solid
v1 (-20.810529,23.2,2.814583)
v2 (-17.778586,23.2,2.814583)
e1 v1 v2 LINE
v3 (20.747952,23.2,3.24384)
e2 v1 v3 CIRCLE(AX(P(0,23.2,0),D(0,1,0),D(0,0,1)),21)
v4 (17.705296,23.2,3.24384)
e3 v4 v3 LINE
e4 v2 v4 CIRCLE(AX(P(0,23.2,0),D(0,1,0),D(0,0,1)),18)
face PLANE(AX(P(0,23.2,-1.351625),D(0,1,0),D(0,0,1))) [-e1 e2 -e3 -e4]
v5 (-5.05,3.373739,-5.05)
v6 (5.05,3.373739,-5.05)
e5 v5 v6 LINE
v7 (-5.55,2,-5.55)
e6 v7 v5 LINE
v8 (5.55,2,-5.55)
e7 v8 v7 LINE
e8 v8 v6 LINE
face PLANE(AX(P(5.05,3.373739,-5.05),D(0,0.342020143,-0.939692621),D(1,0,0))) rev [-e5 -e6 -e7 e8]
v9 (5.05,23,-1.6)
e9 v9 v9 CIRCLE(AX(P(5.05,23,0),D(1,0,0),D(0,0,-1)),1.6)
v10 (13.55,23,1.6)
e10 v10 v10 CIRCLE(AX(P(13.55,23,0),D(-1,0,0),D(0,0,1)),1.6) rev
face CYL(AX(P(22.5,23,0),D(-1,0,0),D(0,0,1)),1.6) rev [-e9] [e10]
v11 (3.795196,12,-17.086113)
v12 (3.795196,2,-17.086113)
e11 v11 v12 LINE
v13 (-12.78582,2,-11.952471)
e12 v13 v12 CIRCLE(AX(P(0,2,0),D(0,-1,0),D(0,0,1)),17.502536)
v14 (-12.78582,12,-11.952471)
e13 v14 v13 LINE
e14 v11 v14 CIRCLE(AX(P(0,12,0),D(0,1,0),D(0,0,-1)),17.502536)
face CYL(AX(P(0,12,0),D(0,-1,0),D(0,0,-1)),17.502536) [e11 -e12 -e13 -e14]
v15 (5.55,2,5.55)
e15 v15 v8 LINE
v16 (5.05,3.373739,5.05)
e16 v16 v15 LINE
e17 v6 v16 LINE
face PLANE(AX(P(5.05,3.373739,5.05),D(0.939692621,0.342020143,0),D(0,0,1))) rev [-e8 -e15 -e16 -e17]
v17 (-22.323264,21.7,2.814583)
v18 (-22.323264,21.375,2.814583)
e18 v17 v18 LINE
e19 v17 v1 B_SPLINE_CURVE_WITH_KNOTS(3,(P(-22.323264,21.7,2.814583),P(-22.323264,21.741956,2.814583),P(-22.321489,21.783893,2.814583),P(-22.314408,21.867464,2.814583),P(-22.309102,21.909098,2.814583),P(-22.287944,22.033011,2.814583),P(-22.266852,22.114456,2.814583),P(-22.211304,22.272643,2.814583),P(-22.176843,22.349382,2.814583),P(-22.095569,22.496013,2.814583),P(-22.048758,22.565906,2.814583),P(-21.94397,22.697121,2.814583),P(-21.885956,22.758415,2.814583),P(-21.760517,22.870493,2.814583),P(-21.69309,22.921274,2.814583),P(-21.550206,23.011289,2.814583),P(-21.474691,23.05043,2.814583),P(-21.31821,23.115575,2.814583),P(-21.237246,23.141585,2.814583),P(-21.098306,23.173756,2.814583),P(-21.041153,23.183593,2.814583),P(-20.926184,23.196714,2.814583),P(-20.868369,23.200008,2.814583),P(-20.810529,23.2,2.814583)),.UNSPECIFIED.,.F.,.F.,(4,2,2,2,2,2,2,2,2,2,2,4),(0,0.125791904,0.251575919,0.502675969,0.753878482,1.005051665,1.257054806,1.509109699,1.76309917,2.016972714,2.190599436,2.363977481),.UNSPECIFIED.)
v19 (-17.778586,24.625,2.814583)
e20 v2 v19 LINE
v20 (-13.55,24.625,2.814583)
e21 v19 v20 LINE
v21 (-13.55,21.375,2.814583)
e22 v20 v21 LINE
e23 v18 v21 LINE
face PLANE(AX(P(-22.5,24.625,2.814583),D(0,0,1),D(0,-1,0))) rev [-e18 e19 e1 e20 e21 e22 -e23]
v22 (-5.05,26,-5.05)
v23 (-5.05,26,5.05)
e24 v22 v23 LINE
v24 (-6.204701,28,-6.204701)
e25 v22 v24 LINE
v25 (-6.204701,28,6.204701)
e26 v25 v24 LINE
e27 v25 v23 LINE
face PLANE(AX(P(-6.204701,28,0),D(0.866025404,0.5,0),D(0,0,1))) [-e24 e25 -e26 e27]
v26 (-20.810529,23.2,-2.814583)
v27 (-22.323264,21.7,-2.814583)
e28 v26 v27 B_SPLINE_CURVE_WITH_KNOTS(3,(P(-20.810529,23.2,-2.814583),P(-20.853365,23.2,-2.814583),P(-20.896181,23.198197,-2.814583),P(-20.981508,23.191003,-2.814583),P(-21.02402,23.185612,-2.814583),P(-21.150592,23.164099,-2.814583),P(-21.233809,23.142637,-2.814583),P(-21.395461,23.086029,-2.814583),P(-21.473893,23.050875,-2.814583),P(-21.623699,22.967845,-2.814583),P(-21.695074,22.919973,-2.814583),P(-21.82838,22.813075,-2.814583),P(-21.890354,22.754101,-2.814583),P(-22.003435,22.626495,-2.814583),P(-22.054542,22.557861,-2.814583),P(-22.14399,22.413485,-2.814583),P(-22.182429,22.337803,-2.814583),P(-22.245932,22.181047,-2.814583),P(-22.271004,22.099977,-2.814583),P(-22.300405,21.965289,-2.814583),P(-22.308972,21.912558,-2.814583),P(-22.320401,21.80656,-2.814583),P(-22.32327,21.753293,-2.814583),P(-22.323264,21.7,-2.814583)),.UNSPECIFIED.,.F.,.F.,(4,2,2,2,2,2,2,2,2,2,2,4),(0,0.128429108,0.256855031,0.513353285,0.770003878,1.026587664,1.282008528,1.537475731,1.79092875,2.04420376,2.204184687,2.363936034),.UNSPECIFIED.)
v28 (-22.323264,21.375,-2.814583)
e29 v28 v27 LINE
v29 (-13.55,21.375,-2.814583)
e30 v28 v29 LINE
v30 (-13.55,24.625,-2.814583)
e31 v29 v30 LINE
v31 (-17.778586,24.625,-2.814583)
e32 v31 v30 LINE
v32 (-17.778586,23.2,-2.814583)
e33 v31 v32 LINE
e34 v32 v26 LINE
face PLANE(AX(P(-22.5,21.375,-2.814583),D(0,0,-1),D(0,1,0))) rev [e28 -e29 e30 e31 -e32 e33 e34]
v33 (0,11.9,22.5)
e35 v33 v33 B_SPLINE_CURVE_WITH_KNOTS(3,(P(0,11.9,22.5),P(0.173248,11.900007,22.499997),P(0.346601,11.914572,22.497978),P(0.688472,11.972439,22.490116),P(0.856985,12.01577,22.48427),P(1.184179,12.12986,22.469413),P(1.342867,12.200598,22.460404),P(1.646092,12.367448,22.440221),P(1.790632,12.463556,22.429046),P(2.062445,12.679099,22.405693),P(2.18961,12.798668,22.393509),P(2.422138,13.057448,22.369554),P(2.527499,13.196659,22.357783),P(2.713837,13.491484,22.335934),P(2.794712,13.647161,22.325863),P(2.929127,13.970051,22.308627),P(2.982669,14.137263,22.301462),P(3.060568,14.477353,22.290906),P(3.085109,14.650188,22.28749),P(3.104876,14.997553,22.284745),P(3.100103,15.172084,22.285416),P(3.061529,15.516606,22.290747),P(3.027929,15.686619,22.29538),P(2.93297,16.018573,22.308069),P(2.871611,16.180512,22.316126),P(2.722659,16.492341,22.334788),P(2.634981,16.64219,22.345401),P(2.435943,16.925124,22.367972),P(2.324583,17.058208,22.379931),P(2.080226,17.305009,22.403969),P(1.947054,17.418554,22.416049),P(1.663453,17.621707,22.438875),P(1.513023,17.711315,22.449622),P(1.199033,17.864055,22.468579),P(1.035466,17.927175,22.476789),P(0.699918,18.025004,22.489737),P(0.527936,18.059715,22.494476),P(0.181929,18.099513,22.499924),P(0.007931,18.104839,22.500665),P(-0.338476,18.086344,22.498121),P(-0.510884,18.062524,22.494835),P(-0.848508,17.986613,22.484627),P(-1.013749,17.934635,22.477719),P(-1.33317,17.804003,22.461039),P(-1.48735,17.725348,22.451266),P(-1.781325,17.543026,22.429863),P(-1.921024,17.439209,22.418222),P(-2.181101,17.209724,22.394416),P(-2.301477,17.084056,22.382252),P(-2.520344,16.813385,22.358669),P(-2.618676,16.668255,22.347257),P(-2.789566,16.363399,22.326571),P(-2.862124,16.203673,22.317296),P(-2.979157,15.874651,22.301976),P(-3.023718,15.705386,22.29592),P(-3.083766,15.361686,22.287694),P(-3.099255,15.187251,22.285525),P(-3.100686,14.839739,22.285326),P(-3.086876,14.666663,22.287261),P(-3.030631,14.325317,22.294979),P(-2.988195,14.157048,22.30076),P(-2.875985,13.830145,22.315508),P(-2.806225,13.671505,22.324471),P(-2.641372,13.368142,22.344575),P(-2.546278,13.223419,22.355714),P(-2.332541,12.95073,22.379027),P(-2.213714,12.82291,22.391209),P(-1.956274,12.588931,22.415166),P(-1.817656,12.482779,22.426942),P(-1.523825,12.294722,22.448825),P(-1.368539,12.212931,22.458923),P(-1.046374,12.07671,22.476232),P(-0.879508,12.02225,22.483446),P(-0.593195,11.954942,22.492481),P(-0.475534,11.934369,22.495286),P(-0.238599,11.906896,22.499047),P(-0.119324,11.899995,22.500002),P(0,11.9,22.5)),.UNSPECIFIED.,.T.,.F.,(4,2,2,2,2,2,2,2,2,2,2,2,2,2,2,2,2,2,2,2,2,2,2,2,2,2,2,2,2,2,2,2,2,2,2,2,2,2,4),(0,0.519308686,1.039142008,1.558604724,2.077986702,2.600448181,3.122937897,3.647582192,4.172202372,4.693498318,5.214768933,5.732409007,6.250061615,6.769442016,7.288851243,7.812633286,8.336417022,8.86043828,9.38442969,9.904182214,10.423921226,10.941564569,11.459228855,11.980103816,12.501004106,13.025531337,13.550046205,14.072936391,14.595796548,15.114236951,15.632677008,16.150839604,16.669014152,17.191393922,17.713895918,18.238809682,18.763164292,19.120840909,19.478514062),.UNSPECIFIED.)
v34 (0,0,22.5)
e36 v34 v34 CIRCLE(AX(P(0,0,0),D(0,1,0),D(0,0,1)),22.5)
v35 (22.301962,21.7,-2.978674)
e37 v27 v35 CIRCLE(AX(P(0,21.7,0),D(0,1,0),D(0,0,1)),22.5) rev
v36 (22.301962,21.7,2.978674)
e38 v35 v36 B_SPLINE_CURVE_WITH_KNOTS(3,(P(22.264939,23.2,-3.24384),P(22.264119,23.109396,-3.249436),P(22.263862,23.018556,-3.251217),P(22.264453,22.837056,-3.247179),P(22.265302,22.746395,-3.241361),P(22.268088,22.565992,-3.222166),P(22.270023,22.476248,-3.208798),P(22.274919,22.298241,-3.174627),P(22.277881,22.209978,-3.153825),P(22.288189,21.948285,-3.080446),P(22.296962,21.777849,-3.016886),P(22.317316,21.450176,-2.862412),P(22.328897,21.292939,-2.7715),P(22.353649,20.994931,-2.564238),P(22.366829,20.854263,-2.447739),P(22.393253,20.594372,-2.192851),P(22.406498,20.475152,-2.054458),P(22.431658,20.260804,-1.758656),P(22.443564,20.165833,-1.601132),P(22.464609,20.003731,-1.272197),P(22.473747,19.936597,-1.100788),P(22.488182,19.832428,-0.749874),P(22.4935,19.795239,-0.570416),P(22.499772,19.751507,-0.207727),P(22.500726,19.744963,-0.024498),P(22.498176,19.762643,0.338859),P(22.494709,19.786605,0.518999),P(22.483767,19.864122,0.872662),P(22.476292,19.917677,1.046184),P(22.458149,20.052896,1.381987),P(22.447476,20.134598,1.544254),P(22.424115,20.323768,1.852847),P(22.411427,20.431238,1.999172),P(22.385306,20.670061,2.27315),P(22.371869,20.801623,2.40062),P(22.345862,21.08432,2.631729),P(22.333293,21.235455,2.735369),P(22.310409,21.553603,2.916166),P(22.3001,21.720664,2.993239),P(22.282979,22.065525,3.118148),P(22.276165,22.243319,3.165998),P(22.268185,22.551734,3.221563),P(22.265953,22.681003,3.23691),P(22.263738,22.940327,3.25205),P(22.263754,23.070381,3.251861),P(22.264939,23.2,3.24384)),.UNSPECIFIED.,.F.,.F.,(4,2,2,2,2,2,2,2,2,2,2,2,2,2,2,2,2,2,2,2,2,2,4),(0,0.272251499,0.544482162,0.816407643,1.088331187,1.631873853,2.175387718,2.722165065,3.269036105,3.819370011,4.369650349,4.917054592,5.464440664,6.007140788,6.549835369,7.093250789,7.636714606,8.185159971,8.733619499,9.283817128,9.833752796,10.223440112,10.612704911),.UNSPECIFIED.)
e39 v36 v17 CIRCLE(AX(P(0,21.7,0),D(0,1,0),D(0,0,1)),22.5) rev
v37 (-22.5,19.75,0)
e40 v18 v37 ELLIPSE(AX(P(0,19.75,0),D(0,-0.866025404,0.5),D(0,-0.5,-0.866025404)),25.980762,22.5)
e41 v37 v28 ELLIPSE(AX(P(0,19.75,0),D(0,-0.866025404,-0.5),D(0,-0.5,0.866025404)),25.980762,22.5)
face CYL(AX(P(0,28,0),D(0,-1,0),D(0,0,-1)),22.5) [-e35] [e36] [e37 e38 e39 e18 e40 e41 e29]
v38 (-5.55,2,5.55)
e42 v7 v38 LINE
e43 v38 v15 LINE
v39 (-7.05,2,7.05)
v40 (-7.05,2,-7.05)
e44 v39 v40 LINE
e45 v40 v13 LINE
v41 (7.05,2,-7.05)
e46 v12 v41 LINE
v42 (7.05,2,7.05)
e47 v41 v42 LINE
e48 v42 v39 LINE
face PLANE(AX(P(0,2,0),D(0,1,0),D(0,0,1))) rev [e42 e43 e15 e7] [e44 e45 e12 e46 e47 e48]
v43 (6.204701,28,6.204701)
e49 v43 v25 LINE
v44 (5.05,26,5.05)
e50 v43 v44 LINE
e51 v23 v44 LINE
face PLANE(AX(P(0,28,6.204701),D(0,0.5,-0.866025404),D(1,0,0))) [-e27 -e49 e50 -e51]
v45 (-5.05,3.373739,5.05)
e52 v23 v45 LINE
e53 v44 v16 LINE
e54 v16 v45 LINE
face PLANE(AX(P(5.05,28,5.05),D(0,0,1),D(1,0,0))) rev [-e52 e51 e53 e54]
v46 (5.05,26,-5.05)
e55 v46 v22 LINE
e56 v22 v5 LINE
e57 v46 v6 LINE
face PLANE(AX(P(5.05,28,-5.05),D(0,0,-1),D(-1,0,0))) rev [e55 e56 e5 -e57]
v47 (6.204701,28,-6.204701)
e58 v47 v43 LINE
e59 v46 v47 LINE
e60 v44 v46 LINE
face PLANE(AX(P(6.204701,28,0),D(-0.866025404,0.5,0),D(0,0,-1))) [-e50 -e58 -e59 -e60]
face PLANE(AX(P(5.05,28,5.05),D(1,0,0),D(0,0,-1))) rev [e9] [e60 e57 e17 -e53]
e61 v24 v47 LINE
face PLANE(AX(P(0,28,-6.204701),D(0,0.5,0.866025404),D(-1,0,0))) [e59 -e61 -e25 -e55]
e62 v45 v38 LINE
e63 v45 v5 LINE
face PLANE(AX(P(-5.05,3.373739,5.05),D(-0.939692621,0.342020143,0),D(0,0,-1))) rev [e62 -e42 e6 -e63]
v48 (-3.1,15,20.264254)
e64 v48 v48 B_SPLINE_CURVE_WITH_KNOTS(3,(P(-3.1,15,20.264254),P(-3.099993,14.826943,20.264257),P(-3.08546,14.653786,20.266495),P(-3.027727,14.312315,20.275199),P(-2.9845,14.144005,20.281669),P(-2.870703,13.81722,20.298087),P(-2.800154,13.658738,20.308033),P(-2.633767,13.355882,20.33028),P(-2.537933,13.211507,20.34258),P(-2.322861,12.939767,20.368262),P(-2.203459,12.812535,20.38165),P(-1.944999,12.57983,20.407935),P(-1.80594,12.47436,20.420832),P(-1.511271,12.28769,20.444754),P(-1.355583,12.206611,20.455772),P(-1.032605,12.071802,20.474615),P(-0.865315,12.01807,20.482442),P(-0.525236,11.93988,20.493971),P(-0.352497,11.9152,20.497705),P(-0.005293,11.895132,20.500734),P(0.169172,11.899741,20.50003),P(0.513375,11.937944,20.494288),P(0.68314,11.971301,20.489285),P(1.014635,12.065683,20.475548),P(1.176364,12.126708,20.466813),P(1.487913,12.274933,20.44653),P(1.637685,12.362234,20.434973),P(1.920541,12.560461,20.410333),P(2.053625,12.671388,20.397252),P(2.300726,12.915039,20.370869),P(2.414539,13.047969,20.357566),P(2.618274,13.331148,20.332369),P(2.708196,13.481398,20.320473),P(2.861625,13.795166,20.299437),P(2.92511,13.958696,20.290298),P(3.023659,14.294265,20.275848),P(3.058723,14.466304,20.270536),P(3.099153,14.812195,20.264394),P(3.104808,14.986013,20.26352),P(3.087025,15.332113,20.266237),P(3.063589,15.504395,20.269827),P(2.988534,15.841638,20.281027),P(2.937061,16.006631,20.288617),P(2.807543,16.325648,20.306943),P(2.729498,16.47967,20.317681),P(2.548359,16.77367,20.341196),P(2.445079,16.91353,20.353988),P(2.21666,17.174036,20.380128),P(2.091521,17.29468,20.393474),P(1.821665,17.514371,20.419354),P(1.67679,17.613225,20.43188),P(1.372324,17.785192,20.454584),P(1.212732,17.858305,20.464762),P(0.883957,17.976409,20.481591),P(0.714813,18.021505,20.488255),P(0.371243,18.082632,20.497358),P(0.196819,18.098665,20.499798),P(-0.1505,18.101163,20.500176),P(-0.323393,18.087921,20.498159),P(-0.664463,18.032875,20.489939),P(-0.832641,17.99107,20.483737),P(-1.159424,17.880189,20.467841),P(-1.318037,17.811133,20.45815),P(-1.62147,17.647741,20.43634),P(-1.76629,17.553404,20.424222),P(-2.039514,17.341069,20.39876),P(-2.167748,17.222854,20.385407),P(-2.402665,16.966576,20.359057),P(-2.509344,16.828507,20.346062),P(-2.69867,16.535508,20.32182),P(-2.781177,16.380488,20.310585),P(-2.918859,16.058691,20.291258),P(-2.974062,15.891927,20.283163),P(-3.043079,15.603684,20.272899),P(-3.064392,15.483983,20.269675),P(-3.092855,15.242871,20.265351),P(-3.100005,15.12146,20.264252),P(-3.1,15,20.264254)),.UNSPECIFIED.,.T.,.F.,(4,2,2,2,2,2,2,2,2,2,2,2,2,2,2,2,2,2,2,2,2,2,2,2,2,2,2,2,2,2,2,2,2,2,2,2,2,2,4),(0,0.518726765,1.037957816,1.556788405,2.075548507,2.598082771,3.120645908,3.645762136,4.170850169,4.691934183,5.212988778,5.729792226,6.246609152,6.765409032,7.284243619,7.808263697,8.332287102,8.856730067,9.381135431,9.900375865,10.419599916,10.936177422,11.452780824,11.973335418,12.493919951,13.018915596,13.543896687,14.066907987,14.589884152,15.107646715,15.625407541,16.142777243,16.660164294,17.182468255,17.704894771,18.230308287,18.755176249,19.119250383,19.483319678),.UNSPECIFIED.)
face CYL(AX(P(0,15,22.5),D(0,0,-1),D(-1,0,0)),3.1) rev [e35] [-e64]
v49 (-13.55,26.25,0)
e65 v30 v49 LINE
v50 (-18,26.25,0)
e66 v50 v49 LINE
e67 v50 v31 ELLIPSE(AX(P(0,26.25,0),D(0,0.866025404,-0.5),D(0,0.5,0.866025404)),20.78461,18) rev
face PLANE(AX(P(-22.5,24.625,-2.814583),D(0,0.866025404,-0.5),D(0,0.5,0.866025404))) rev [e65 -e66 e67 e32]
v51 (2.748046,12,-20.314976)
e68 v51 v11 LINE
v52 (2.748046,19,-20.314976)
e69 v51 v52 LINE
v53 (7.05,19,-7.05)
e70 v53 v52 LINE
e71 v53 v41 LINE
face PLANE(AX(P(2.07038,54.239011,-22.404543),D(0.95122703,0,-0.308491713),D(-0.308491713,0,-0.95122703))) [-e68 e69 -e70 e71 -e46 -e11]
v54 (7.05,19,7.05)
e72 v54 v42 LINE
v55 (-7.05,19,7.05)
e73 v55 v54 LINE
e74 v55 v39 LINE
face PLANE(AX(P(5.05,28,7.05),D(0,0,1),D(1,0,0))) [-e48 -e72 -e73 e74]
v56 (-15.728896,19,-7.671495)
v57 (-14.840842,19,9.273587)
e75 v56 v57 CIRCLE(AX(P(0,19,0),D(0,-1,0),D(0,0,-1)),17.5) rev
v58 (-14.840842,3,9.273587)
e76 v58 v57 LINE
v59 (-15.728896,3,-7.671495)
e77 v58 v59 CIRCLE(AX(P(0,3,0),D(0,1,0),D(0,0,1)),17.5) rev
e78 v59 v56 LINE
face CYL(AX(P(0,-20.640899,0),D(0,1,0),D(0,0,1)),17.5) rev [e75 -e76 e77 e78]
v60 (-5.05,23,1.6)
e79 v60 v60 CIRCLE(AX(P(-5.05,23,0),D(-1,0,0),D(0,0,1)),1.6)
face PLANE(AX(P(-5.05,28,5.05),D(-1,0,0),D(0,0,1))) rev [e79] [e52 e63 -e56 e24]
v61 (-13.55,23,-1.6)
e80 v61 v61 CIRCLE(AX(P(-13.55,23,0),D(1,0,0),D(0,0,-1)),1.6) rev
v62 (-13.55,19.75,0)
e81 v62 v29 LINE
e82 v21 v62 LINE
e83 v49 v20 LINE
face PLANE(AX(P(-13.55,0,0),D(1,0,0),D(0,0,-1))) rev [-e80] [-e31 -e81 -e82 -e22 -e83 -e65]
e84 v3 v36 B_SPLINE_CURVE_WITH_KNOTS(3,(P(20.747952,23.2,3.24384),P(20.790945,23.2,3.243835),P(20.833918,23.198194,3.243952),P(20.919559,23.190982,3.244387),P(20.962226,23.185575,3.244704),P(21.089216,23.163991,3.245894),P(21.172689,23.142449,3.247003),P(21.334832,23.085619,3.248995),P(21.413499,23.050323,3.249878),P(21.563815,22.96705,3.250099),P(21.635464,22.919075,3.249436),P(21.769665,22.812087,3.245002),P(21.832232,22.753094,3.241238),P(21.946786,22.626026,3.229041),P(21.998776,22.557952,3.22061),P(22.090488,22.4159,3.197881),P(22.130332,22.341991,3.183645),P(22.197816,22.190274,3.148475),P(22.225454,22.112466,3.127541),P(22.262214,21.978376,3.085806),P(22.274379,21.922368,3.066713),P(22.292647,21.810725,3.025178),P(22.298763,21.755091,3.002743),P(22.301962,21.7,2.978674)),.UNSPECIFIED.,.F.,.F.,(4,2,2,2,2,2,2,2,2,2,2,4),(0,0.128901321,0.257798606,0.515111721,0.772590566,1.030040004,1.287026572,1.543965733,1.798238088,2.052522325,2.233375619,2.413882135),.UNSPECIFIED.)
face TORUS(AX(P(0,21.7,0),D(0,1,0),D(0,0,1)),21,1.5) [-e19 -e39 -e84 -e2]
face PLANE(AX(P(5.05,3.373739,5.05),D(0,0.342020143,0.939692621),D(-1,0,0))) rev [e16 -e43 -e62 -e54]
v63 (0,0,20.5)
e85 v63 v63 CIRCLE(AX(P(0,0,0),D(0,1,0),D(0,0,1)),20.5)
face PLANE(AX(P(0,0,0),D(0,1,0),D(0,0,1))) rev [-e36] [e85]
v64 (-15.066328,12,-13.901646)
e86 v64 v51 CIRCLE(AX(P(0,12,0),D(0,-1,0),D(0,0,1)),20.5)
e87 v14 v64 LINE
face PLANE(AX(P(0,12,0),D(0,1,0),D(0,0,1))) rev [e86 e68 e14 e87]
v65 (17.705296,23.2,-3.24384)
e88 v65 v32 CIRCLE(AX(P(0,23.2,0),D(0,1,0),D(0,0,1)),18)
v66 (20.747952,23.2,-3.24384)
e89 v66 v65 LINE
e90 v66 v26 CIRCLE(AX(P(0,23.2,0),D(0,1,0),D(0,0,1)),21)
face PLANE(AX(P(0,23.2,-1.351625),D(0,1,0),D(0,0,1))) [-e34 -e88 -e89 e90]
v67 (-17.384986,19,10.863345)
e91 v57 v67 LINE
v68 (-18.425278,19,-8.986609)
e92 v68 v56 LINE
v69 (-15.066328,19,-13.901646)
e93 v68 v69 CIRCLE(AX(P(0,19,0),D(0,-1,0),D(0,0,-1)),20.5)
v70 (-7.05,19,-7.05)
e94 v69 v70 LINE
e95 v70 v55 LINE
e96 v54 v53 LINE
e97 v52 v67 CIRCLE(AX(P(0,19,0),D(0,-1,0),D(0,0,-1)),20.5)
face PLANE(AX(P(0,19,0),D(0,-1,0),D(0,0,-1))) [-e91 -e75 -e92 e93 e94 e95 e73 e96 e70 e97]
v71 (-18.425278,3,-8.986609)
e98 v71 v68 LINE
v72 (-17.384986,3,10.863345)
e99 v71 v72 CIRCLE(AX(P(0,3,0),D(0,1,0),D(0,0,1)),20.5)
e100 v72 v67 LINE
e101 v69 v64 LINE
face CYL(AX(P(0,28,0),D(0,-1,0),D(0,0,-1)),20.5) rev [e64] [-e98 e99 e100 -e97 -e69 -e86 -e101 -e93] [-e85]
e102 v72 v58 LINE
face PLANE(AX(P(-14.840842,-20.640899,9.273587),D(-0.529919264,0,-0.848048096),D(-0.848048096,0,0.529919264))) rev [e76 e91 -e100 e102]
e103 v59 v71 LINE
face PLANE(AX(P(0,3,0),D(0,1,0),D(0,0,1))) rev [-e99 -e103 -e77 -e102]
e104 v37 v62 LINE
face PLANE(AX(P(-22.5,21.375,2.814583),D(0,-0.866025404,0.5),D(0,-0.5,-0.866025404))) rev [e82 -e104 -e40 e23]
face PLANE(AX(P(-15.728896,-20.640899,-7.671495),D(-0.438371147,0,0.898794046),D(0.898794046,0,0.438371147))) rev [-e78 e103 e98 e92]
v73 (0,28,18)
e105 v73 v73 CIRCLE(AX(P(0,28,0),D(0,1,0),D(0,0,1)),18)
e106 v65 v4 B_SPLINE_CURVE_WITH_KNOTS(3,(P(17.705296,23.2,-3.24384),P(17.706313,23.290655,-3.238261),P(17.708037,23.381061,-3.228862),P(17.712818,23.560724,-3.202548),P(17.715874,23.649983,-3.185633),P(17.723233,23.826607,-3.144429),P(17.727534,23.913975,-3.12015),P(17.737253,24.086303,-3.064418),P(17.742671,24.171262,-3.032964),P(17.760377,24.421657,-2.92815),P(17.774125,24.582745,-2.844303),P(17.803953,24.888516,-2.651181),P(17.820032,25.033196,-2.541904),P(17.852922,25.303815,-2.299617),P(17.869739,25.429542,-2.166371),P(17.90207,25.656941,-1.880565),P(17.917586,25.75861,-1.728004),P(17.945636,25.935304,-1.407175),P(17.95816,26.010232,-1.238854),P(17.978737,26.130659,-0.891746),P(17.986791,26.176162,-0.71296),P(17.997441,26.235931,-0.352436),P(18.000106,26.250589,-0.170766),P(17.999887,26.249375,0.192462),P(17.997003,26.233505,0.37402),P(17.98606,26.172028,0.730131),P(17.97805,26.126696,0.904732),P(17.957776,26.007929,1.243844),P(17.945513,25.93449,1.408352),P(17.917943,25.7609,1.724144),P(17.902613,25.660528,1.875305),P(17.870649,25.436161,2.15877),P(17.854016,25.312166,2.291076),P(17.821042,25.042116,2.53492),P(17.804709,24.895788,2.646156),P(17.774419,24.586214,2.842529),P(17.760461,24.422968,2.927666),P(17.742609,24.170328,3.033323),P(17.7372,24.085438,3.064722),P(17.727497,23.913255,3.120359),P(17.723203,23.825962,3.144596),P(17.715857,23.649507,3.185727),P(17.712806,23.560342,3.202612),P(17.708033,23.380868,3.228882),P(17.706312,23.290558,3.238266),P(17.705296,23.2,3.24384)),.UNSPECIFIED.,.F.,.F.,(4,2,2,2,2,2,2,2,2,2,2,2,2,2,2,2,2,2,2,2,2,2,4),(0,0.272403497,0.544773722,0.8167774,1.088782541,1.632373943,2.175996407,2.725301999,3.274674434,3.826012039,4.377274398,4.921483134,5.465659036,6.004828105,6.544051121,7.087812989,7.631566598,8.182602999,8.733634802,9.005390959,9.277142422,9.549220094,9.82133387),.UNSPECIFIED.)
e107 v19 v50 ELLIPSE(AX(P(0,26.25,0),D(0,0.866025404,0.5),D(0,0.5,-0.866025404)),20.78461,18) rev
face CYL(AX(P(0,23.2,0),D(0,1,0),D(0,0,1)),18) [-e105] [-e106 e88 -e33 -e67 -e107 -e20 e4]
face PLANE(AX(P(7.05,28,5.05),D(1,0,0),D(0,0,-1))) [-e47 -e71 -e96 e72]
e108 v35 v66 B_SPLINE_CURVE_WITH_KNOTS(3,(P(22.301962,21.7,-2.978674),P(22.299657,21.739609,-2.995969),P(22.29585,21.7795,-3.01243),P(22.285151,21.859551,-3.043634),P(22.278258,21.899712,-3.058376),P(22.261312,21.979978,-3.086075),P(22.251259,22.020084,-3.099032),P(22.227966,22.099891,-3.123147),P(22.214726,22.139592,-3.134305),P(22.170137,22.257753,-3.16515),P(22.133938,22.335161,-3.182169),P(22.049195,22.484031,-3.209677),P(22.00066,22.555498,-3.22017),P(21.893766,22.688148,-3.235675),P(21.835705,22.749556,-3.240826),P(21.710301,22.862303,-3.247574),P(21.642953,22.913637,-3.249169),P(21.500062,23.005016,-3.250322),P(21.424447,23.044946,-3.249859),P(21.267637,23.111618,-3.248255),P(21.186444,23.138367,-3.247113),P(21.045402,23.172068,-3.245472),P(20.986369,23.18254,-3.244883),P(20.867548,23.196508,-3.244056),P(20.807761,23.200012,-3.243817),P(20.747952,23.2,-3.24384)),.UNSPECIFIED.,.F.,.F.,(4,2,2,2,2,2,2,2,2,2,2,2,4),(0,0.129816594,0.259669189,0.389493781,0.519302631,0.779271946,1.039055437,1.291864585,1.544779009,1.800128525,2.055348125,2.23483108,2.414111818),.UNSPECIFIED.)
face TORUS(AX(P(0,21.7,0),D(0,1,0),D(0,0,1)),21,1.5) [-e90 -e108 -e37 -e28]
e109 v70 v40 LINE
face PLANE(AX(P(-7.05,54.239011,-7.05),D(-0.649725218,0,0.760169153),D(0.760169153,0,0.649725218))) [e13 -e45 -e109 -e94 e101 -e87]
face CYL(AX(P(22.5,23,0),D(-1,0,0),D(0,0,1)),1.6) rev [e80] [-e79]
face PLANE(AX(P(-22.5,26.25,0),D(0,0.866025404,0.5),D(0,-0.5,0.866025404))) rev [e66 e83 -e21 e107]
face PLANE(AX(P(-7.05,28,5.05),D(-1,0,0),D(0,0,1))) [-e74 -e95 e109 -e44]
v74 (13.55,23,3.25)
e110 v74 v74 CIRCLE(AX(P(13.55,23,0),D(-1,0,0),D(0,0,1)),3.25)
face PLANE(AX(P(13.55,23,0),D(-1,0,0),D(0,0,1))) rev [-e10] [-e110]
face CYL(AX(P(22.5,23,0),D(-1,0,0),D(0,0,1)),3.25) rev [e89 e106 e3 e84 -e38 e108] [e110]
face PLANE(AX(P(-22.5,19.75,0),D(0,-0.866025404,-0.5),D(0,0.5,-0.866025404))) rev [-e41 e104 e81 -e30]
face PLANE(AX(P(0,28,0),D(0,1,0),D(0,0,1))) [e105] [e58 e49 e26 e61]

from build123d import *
from OCP.BRepFilletAPI import BRepFilletAPI_MakeChamfer

# Parameters (mm, degrees)
SKETCH1_R                = 22.5
BOSS_EXTRUDE1_DEPTH      = 28
SKETCH2_W                = 10.1
SKETCH2_H                = 10.1
CUT_EXTRUDE2_DEPTH       = 43.385138905
SHELL3_T                 = -2
SKETCH3_R                = 3.1
CUT_EXTRUDE3_DEPTH       = 47.51292831
CHAMFER1_SIZE            = 2
CHAMFER1_SIZE2           = 1.154700538
BOSS_EXTRUDE8_START      = 23
BOSS_EXTRUDE8_DEPTH      = 23
BOSS_EXTRUDE4_DEPTH      = 20
BOSS_EXTRUDE6_DEPTH      = 26
CUT_EXTRUDE5_DEPTH       = 12
CUT_EXTRUDE9_DEPTH       = 2
BOSS_EXTRUDE10_START     = 7
BOSS_EXTRUDE10_DEPTH     = 7
SKETCH21_OUTSIDE_W       = 61.262
SKETCH21_OUTSIDE_H       = 63.965
SKETCH21_OUTSIDE_R       = 18
CUT_EXTRUDE11_DEPTH      = 4.8
CUT_EXTRUDE12_DEPTH      = 47.67125763
CUT_EXTRUDE12_DEPTH_BACK = 47.67125763
SKETCH22_R               = 1.6
CUT_EXTRUDE13_START      = -8.5
SKETCH24_R               = 3.25
CUT_EXTRUDE13_DEPTH      = 39.17125769
CUT_EXTRUDE14_START      = -8.5
CUT_EXTRUDE14_DEPTH      = 39.171257692
FILLET1_R                = 1.5
SKETCH26_R               = 43.919943133
SKETCH26_R_2             = 22.5
CUT_EXTRUDE15_DEPTH      = 44.879993089
CHAMFER2_SIZE            = 0.5
CHAMFER2_SIZE2           = 1.37373871


with BuildPart() as part:
    # Sketch1 → Boss-Extrude1 (new body)
    with BuildSketch(Plane(origin=(0, 0, 0), x_dir=(1, 0, 0), z_dir=(0, 1, 0))):
        with Locations(Location((0, 0, 0), (0, 0, 270))):
            Circle(SKETCH1_R)
    extrude(amount=BOSS_EXTRUDE1_DEPTH)

    # Sketch2 → Cut-Extrude2 (cut, through all)
    with BuildSketch(Plane.XZ):
        Rectangle(SKETCH2_W, SKETCH2_H)
    extrude(amount=-CUT_EXTRUDE2_DEPTH, mode=Mode.SUBTRACT)

    # Shell3
    shell3_openings = [part.faces().sort_by_distance(p)[0] for p in [
        (0, 0, -21.863603897),
    ]]
    offset(amount=SHELL3_T, openings=shell3_openings, kind=Kind.INTERSECTION)

    # Sketch3 → Cut-Extrude3 (cut, through all)
    with BuildSketch(Plane.XY.offset(7.05)):
        with Locations(Location((0, 15, 0), (0, 0, 270.000000016))):
            Circle(SKETCH3_R)
    extrude(amount=CUT_EXTRUDE3_DEPTH, mode=Mode.SUBTRACT)

    # Chamfer1: one chamfer whose edges measure the first distance from different faces: ONE call of the kernel's chamfer builder (chamfer() names one face for all edges)
    chamfer1_edges_1 = [part.edges().sort_by_distance(p)[0] for p in [
        (5.05, 28, 0),
    ]]
    chamfer1_side_1 = [part.faces().sort_by_distance(p)[0] for p in [
        (5.05, 14, 0),
    ]]
    chamfer1_edges_2 = [part.edges().sort_by_distance(p)[0] for p in [
        (0, 28, -5.05),
    ]]
    chamfer1_side_2 = [part.faces().sort_by_distance(p)[0] for p in [
        (0, 14, -5.05),
    ]]
    chamfer1_edges_3 = [part.edges().sort_by_distance(p)[0] for p in [
        (-5.05, 28, 0),
    ]]
    chamfer1_side_3 = [part.faces().sort_by_distance(p)[0] for p in [
        (-5.05, 14, 0),
    ]]
    chamfer1_edges_4 = [part.edges().sort_by_distance(p)[0] for p in [
        (0, 28, 5.05),
    ]]
    chamfer1_side_4 = [part.faces().sort_by_distance(p)[0] for p in [
        (0, 14, 5.05),
    ]]
    chamfer1 = BRepFilletAPI_MakeChamfer(part.part.solid().wrapped)
    for e in chamfer1_edges_1:
        chamfer1.Add(CHAMFER1_SIZE, CHAMFER1_SIZE2, e.wrapped, chamfer1_side_1[0].wrapped)  # the first distance lies on this face
    for e in chamfer1_edges_2:
        chamfer1.Add(CHAMFER1_SIZE, CHAMFER1_SIZE2, e.wrapped, chamfer1_side_2[0].wrapped)  # the first distance lies on this face
    for e in chamfer1_edges_3:
        chamfer1.Add(CHAMFER1_SIZE, CHAMFER1_SIZE2, e.wrapped, chamfer1_side_3[0].wrapped)  # the first distance lies on this face
    for e in chamfer1_edges_4:
        chamfer1.Add(CHAMFER1_SIZE, CHAMFER1_SIZE2, e.wrapped, chamfer1_side_4[0].wrapped)  # the first distance lies on this face
    add(Compound.cast(chamfer1.Shape()), mode=Mode.REPLACE)

    # Sketch18 → Boss-Extrude8 (add)
    with BuildSketch(Plane.XZ.offset(-26).offset(BOSS_EXTRUDE8_START)):
        with BuildLine():
            Line((-15.72889581, -7.671495069), (-18.425277949, -8.986608509))
            ThreePointArc((-18.425277949, -8.986608509), (-20.471905462, 1.072887103), (-17.384985971, 10.863344917))
            Line((-17.384985971, 10.863344917), (-14.840841683, 9.273587124))
            ThreePointArc((-14.840841683, 9.273587124), (-17.476016858, 0.915879234), (-15.72889581, -7.671495069))
        make_face()
    extrude(amount=-BOSS_EXTRUDE8_DEPTH)

    # Sketch9 → Boss-Extrude4 (add)
    with BuildSketch(Plane.XZ):
        Polygon((2.070380013, -22.404542544), (-16.587666088, -15.201951643), (-17.668054723, -18.000658558), (0.989991378, -25.203249459), align=None)
    extrude(amount=-BOSS_EXTRUDE4_DEPTH)

    # Sketch11 → Boss-Extrude6 (add)
    with BuildSketch(Plane.XZ):
        with BuildLine():
            Line((2.070380013, -22.404542544), (7.05, -7.05))
            Line((7.05, -7.05), (-7.05, -7.05))
            Line((-7.05, -7.05), (-16.587666088, -15.201951643))
            ThreePointArc((-16.587666088, -15.201951643), (-8.102914764, -20.990301864), (2.070380013, -22.404542544))
        make_face()
    extrude(amount=-BOSS_EXTRUDE6_DEPTH)

    # Sketch12 → Cut-Extrude5 (cut)
    with BuildSketch(Plane.XZ):
        with BuildLine():
            Line((3.795196001, -17.086112517), (2.74804579, -20.314975863))
            ThreePointArc((2.74804579, -20.314975863), (-6.94389773, -19.288138436), (-15.066327631, -13.901646367))
            Line((-15.066327631, -13.901646367), (-12.785820172, -11.952470714))
            ThreePointArc((-12.785820172, -11.952470714), (-5.176523958, -16.719520129), (3.795196001, -17.086112517))
        make_face()
    extrude(amount=-CUT_EXTRUDE5_DEPTH, mode=Mode.SUBTRACT)

    # Sketch17 → Cut-Extrude9 (cut)
    with BuildSketch(Plane.XZ):
        with BuildLine():
            Line((7.05, 7.05), (7.05, -7.05))
            Line((7.05, -7.05), (3.795196001, -17.086112517))
            ThreePointArc((3.795196001, -17.086112517), (-5.176523958, -16.719520129), (-12.785820172, -11.952470714))
            Line((-12.785820172, -11.952470714), (-7.05, -7.05))
            Line((-7.05, -7.05), (-7.05, 7.05))
            Line((-7.05, 7.05), (7.05, 7.05))
        make_face()
    extrude(amount=-CUT_EXTRUDE9_DEPTH, mode=Mode.SUBTRACT)

    # Sketch20 → Boss-Extrude10 (add)
    with BuildSketch(Plane.XZ.offset(-26).offset(BOSS_EXTRUDE10_START)):
        with BuildLine():
            Line((2.74804579, -20.314975863), (7.05, -7.05))
            Line((7.05, -7.05), (7.05, 7.05))
            Line((7.05, 7.05), (-7.05, 7.05))
            Line((-7.05, 7.05), (-7.05, -7.05))
            Line((-7.05, -7.05), (-15.066327631, -13.901646367))
            ThreePointArc((-15.066327631, -13.901646367), (6.94389773, 19.288138436), (2.74804579, -20.314975863))
        make_face()
    extrude(amount=-BOSS_EXTRUDE10_DEPTH)

    # Sketch21 outside → Cut-Extrude11 (cut)
    with BuildSketch(Plane(origin=(0, 28, 0), x_dir=(1, 0, 0), z_dir=(0, 1, 0))):
        with Locations((0, 1.3515)):
            Rectangle(SKETCH21_OUTSIDE_W, SKETCH21_OUTSIDE_H)
        with Locations(Location((0, 0, 0), (0, 0, 270))):
            Circle(SKETCH21_OUTSIDE_R, mode=Mode.SUBTRACT)
    extrude(amount=-CUT_EXTRUDE11_DEPTH, mode=Mode.SUBTRACT)

    # Sketch22 → Cut-Extrude12 (cut, two sides: drawn at the far end of the back side and taken through both)
    with BuildSketch(Plane.ZY.offset(-5.05).offset(-CUT_EXTRUDE12_DEPTH_BACK)):
        with Locations((0, 23)):
            Circle(SKETCH22_R)
    extrude(amount=CUT_EXTRUDE12_DEPTH + CUT_EXTRUDE12_DEPTH_BACK, mode=Mode.SUBTRACT)

    # Sketch24 → Cut-Extrude13 (cut, through all)
    with BuildSketch(Plane.ZY.offset(-5.05).offset(CUT_EXTRUDE13_START)):
        with Locations((0, 23)):
            Circle(SKETCH24_R)
    extrude(amount=-CUT_EXTRUDE13_DEPTH, mode=Mode.SUBTRACT)

    # Sketch25 → Cut-Extrude14 (cut, through all)
    with BuildSketch(Plane(origin=(-5.05, 0, 0), x_dir=(0, 0, -1), z_dir=(1, 0, 0)).offset(CUT_EXTRUDE14_START)):
        Polygon((0, 19.75), (2.814582562, 21.375), (2.814582562, 24.625), (0, 26.25), (-2.814582562, 24.625), (-2.814582562, 21.375), align=None)
    extrude(amount=-CUT_EXTRUDE14_DEPTH, mode=Mode.SUBTRACT)

    # Fillet1
    # the kernel refuses this fillet: 1.5 mm, written as the material it takes off along each edge
    with BuildSketch(Plane(origin=(0, 23.2, 0), x_dir=(0, 0, 1), z_dir=(1, 0, 0))) as fillet1_piece_1:
        with BuildLine():
            CenterArc((22.5 - FILLET1_R, FILLET1_R), FILLET1_R, 270, 90)
            Line((22.5, FILLET1_R), (22.5, 0))
            Line((22.5, 0), (22.5 - FILLET1_R, 0))
        make_face()
    revolve(axis=Axis((0, 23.2, 0), (0, -1, 0)), revolution_arc=92.366443414, mode=Mode.SUBTRACT)
    with BuildSketch(Plane(origin=(0, 23.2, 0), x_dir=(-0.9991402664664062, 0, 0.041457543649361384), z_dir=(0.041457543649361384, 0, 0.9991402664664062))) as fillet1_piece_2:
        with BuildLine():
            CenterArc((22.5 - FILLET1_R, FILLET1_R), FILLET1_R, 270, 90)
            Line((22.5, FILLET1_R), (22.5, 0))
            Line((22.5, 0), (22.5 - FILLET1_R, 0))
        make_face()
    revolve(axis=Axis((0, 23.2, 0), (0, -1, 0)), revolution_arc=183.648889302, mode=Mode.SUBTRACT)
    with BuildSketch(Plane(origin=(0, 23.2, 0), x_dir=(0.9997569746526436, 0, -0.022045217925738058), z_dir=(-0.022045217925738058, 0, -0.9997569746526436))) as fillet1_piece_3:
        with BuildLine():
            CenterArc((22.5 - FILLET1_R, FILLET1_R), FILLET1_R, 270, 90)
            Line((22.5, FILLET1_R), (22.5, 0))
            Line((22.5, 0), (22.5 - FILLET1_R, 0))
        make_face()
    revolve(axis=Axis((0, 23.2, 0), (0, -1, 0)), revolution_arc=91.263200277, mode=Mode.SUBTRACT)

    # Sketch26 → Cut-Extrude15 (cut, through all)
    with BuildSketch(Plane.XZ):
        Circle(SKETCH26_R)
        with Locations(Location((0, 0, 0), (0, 0, 352.392535773))):
            Circle(SKETCH26_R_2, mode=Mode.SUBTRACT)
    extrude(amount=-CUT_EXTRUDE15_DEPTH, mode=Mode.SUBTRACT)

    # Chamfer2
    chamfer2_edges = [part.edges().sort_by_distance(p)[0] for p in [
        (0, 2, 5.05),
        (-5.05, 2, 0),
        (0, 2, -5.05),
        (5.05, 2, 0),
    ]]
    chamfer2_side = [part.faces().sort_by_distance(p)[0] for p in [
        (-1.341973038, 2, -7.273001119),
    ]]
    chamfer(chamfer2_edges, length=CHAMFER2_SIZE, length2=CHAMFER2_SIZE2, reference=chamfer2_side[0])


solid = part.part
